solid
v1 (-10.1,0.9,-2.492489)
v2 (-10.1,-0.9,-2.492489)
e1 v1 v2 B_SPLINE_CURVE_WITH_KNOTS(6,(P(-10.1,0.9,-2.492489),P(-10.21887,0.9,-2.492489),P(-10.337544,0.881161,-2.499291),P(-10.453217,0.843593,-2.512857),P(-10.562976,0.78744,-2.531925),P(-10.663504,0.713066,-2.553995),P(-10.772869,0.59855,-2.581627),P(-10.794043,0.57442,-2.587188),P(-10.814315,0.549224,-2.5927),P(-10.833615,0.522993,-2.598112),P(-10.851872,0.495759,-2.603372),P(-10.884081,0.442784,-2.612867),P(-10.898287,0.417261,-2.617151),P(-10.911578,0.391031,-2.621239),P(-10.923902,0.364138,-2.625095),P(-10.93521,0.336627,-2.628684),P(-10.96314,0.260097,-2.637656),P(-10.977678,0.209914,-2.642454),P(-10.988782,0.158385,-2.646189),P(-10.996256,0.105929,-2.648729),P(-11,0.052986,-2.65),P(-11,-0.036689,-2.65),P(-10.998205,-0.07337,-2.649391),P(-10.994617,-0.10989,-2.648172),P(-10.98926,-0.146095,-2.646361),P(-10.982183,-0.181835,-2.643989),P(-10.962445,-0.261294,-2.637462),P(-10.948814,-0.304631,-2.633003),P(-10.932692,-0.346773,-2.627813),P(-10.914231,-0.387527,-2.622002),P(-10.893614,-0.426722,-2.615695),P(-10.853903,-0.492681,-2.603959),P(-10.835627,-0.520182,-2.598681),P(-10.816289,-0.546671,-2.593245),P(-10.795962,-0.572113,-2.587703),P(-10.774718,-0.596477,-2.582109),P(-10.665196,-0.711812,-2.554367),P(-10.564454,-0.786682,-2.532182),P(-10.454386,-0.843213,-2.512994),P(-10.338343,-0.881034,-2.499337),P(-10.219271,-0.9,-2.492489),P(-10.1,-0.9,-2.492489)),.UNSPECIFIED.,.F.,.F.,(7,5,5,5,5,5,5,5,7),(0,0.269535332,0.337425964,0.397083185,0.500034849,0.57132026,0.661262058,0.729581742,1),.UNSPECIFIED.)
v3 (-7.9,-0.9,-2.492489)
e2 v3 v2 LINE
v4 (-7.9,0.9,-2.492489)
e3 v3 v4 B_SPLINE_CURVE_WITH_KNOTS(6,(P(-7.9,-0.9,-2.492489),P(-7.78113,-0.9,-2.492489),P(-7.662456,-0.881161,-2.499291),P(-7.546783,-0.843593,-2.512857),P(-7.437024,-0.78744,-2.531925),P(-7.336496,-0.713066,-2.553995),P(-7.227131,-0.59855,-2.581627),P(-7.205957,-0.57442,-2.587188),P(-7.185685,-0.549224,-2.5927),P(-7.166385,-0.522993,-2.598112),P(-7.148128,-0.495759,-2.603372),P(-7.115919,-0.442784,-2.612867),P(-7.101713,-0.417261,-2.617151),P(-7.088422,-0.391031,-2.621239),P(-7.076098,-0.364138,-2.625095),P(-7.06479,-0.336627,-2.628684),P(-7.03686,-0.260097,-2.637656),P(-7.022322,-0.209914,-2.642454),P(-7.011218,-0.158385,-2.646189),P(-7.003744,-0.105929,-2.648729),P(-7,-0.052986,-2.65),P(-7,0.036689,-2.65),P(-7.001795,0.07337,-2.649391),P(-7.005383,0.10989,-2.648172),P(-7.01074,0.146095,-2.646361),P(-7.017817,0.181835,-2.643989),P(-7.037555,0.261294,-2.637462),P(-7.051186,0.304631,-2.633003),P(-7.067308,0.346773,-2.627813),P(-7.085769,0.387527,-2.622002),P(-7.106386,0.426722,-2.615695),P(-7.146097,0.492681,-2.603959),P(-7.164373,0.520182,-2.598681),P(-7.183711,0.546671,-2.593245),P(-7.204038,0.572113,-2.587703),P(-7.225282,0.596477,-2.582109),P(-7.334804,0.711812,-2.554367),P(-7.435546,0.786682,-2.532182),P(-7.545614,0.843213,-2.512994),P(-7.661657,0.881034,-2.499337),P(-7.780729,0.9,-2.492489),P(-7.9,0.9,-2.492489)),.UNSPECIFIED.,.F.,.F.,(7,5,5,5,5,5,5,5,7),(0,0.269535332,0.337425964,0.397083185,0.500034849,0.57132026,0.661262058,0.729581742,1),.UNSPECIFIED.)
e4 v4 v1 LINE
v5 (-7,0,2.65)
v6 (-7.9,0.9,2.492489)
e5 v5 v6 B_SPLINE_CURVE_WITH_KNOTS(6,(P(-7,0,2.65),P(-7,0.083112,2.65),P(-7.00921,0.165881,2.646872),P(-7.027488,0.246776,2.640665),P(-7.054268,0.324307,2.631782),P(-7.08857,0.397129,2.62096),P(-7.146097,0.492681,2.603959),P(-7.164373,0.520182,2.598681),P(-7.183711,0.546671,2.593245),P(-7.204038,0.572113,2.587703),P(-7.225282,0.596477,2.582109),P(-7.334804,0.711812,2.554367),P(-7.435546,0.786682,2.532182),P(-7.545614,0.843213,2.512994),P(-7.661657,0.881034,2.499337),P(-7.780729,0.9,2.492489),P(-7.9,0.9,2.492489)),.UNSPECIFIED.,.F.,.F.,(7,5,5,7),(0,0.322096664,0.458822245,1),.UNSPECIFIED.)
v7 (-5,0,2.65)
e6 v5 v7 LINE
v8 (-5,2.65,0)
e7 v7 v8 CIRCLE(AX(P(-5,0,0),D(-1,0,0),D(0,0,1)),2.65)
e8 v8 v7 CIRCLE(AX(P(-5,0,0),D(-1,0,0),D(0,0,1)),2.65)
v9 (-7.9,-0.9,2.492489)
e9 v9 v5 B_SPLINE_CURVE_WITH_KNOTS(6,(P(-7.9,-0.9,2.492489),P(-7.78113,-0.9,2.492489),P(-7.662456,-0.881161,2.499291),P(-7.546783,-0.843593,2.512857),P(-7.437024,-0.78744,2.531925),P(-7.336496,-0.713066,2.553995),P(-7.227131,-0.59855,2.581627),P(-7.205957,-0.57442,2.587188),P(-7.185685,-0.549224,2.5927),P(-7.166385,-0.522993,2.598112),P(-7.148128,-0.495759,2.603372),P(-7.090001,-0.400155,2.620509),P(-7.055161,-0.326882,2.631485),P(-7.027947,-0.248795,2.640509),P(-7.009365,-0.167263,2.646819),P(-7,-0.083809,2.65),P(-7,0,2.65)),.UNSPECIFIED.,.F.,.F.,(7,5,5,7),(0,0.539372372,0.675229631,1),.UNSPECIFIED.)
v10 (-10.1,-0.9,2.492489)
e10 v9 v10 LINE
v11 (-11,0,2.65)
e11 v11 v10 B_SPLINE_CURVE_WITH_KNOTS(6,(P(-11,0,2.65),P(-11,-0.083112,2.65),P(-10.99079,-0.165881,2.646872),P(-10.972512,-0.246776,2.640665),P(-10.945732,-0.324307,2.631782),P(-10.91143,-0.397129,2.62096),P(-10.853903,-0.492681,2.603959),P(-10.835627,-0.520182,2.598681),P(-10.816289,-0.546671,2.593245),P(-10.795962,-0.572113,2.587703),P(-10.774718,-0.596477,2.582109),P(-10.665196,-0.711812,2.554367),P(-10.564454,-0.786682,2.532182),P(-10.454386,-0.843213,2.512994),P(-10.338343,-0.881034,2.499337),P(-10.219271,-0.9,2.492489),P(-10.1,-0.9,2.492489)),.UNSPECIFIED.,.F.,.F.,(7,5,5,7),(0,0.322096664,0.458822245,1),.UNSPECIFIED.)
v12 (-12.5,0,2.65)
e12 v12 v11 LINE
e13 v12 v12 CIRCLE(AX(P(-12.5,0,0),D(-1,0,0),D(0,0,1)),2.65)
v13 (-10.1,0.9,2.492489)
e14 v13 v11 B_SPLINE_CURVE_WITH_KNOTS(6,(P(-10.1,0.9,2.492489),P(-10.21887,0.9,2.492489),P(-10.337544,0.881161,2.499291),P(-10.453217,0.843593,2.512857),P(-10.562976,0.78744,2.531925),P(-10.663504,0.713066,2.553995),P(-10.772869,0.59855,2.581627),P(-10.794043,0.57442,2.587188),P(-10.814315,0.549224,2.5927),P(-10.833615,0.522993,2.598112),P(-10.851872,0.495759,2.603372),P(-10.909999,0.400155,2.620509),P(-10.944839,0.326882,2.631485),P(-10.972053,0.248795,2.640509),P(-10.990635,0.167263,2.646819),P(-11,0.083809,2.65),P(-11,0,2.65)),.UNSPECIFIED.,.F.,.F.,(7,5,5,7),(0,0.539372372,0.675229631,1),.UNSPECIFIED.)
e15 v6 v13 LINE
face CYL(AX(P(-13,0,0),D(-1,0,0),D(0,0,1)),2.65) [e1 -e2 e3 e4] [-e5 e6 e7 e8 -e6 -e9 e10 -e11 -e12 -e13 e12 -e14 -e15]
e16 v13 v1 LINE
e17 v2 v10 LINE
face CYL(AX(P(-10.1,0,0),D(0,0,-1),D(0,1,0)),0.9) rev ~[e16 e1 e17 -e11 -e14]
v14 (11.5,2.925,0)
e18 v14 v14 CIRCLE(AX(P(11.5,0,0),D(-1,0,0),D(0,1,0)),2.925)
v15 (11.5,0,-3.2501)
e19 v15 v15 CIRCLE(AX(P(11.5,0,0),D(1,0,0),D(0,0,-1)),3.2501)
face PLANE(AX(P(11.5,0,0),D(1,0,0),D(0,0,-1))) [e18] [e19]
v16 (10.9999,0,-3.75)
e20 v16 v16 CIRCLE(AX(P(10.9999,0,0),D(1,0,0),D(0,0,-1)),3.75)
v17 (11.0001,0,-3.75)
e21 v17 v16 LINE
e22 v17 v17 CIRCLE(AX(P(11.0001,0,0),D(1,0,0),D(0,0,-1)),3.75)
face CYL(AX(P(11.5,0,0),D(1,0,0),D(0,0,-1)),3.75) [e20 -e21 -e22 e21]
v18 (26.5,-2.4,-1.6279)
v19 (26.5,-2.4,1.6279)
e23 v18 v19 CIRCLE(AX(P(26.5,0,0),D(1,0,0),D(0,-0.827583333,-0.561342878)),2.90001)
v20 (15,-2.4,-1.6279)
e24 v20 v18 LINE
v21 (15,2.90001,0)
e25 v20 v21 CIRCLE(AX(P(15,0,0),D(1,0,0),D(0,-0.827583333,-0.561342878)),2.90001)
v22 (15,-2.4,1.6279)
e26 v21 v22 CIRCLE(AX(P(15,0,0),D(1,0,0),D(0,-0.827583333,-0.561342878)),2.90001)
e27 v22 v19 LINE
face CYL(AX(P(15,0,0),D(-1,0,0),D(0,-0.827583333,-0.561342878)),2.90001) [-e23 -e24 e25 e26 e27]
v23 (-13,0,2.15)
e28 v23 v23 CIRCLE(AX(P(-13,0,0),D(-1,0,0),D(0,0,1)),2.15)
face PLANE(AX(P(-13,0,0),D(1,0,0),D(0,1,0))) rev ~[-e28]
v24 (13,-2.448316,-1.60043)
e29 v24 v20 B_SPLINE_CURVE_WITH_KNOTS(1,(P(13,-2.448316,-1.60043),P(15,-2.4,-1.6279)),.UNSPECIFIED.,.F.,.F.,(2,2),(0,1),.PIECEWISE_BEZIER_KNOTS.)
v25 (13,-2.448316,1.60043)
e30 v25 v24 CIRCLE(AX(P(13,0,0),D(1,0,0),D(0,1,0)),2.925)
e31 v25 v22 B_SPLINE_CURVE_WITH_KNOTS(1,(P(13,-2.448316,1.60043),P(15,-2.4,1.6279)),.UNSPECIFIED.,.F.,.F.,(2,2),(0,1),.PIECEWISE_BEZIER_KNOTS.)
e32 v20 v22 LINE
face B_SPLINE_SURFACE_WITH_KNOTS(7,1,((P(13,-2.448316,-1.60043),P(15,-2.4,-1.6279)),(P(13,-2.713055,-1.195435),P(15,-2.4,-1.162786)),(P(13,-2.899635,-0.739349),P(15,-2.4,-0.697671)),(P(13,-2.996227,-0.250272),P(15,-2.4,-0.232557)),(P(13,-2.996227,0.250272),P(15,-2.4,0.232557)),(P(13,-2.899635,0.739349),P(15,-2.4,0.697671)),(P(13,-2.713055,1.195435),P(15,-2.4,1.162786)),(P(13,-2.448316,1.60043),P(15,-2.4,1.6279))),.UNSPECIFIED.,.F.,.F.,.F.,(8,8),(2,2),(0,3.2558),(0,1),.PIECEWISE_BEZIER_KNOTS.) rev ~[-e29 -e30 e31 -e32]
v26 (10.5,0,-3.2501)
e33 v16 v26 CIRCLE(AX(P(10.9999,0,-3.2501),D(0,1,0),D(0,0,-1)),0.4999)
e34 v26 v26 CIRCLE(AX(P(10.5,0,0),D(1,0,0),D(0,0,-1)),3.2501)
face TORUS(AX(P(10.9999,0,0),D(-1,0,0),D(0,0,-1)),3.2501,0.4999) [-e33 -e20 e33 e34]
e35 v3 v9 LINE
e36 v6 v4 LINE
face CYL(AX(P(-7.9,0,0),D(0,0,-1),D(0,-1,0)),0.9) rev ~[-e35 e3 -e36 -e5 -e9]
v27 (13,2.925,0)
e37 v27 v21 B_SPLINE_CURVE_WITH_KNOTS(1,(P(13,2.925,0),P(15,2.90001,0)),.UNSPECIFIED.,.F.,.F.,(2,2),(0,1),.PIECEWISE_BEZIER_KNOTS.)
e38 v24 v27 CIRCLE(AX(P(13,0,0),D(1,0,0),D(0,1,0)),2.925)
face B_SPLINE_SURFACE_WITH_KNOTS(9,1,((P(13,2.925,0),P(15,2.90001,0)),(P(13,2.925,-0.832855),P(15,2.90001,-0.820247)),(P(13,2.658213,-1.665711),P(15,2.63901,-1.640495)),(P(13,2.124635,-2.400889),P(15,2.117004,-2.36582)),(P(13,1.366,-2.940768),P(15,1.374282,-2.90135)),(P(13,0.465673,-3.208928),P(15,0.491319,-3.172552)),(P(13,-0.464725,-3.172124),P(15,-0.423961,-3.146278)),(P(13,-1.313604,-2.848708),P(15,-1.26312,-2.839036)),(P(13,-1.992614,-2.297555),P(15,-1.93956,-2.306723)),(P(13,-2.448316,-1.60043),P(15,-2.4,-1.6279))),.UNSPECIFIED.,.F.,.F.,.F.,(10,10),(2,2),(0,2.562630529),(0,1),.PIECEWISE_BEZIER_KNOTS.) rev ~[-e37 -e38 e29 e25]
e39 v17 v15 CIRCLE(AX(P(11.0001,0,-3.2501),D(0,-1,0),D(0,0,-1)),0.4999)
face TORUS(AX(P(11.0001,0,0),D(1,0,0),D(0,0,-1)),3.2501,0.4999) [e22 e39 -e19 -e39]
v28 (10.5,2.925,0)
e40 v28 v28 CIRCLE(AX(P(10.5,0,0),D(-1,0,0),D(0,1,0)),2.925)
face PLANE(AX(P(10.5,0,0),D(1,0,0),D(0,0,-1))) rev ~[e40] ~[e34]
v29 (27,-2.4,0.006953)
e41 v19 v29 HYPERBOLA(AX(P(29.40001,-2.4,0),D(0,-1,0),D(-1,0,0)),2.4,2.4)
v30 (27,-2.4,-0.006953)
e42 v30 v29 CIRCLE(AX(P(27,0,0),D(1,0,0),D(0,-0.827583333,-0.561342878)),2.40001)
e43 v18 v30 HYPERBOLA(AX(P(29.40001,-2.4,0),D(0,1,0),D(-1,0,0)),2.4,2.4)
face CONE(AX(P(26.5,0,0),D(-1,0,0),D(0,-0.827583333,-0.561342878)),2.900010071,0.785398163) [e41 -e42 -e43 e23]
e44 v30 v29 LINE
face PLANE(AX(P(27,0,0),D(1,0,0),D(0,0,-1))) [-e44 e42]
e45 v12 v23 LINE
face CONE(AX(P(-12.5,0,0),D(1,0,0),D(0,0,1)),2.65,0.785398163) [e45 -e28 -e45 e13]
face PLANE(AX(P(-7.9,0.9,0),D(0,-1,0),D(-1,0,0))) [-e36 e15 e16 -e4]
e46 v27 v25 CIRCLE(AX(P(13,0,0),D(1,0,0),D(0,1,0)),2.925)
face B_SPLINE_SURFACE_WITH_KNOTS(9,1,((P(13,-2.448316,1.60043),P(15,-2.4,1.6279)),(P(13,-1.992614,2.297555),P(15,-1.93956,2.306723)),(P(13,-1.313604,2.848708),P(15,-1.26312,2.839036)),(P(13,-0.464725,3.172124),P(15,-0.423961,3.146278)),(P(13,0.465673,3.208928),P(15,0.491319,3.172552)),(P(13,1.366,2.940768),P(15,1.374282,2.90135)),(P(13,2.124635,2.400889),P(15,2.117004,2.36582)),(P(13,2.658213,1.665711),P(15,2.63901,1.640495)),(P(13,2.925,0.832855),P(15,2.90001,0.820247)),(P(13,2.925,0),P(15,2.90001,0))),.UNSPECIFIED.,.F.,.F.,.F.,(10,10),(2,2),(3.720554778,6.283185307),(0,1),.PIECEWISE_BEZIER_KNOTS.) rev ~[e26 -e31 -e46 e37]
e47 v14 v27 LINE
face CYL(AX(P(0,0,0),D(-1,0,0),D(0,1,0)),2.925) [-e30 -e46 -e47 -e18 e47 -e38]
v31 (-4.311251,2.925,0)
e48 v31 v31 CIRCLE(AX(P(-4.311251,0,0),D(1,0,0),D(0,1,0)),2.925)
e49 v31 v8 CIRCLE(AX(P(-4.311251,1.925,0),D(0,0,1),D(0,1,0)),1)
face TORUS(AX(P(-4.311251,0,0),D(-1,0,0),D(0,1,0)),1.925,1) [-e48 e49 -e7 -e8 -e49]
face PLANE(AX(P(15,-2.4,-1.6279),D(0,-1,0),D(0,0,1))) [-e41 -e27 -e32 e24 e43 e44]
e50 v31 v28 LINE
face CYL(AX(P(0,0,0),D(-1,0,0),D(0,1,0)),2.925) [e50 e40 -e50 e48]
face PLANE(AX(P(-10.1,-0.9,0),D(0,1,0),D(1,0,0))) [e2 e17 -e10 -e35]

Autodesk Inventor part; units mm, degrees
ref_plane "YZ Plane" through (0, 0, 0) normal (1, 0, 0) x (0, 1, 0)
ref_plane "XZ Plane" through (0, 0, 0) normal (0, 1, 0) x (-1, 0, 0)
sketch "Sketch1" plane through (0, 0, 0) normal (1, 0, 0) x (0, 1, 0)
  circle A0 centre (0, 0) radius 2.925
  dimension "diameter" = 5.85
extrude "Shaft" add sketch "Sketch1" along normal mid plane 26
sketch "Sketch2" plane through (0, 0, 0) normal (0, 0, 1) x (1, 0, 0)
  line L0 (-13, -2.925) -> (-13, 2.925) construction
  line L1 (13, -2.925) -> (-13, -2.925) construction
  line L2 (13, 2.925) -> (13, -2.925) construction
  line L3 (-13, 2.925) -> (13, 2.925) construction
  line L4 (-13, -2.925) -> (13, -2.925) projected
  line L5 (-6, -2.925) -> (-6, -2.925)
  line L6 (-13, -2.925) -> (13, -2.925) projected
  line L7 (-11, 0) -> (-7, 0) construction
  line L8 (-10.1, -0.9) -> (-7.9, -0.9)
  line L9 (-7.9, 0.9) -> (-10.1, 0.9)
  arc A0 (-10.1, 0.9) -> (-10.1, -0.9) centre (-10.1, 0) ccw
  arc A1 (-7.9, -0.9) -> (-7.9, 0.9) centre (-7.9, 0) ccw
  point P0 (0, 0)
  point P1 (13, 0)
  point P2 (-9, 0)
  dimension "d17" = 1.8
  dimension "d20" = 2
  dimension "d21" = 1
  dimension "d22" = 7
extrude "Slot for Differential Gear" cut sketch "Sketch2" along normal through all both and the other way through all
ref_plane "Work Plane1" through (15, 0, 0) normal (1, 0, 0) x (0, 0, -1)
sketch "Sketch3" plane through (15, 0, 0) normal (1, 0, 0) x (0, 0, -1)
  arc A0 (1.6583, -2.5) -> (-1.6583, -2.5) centre (0, 0) ccw construction
  circle A1 centre (0, 0) radius 2.925 construction
  line L0 (-1.6583, -2.5) -> (1.6583, -2.5)
  arc A2 (1.6279, -2.4) -> (-1.6279, -2.4) centre (0, 0) ccw
  line L1 (1.6279, -2.4) -> (-1.6279, -2.4)
  point P0 (-1.5184, -2.5)
  point P1 (1.5184, -2.5)
  dimension "d49" = 3
  dimension "d50" = 2.5
  dimension "wheel_offset" = 0.1
extrude "Wheel Insert Profile" add sketch "Sketch3" along normal blind 12
loft "Loft1" add section 1 edges at (13, -2.925, 0) section 2 edges at (15, -2.4, 0) (15, 2.9, 0)
ref_plane "Work Plane2" through (11.5, 0, 0) normal (1, 0, 0) x (0, 0, -1)
sketch "Sketch4" plane through (11.5, 0, 0) normal (1, 0, 0) x (0, 0, -1)
  circle A0 centre (0, 0) radius 3.75
  dimension "d35" = 7.5
extrude "Stopper" add sketch "Sketch4" against normal blind 1
fillet "Fillet1" radius 0.5 2 edges at (11.5, 0, 3.75) (10.5, 0, 3.75)
sketch "Sketch8" plane through (-13, 0, 0) normal (-1, 0, 0) x (0, 0, 1)
  circle A0 centre (0, 0) radius 2.925 projected
  circle A1 centre (0, 0) radius 2.7 construction
  circle A2 centre (0, 0) radius 2.65
  dimension "d68" = 5.4
  dimension "d69" = 0.05
extrude "Differential Gear Insert Profile" cut sketch "Sketch8" against normal blind 8
fillet "Fillet3" radius 1 1 edges at (-5, -2.925, 0)
chamfer "Chamfer4" distance 0.5 angle 45 2 edges at (-13, 0, -2.65) (27, 2.9, 0)
properties part number "rear shaft v2"
